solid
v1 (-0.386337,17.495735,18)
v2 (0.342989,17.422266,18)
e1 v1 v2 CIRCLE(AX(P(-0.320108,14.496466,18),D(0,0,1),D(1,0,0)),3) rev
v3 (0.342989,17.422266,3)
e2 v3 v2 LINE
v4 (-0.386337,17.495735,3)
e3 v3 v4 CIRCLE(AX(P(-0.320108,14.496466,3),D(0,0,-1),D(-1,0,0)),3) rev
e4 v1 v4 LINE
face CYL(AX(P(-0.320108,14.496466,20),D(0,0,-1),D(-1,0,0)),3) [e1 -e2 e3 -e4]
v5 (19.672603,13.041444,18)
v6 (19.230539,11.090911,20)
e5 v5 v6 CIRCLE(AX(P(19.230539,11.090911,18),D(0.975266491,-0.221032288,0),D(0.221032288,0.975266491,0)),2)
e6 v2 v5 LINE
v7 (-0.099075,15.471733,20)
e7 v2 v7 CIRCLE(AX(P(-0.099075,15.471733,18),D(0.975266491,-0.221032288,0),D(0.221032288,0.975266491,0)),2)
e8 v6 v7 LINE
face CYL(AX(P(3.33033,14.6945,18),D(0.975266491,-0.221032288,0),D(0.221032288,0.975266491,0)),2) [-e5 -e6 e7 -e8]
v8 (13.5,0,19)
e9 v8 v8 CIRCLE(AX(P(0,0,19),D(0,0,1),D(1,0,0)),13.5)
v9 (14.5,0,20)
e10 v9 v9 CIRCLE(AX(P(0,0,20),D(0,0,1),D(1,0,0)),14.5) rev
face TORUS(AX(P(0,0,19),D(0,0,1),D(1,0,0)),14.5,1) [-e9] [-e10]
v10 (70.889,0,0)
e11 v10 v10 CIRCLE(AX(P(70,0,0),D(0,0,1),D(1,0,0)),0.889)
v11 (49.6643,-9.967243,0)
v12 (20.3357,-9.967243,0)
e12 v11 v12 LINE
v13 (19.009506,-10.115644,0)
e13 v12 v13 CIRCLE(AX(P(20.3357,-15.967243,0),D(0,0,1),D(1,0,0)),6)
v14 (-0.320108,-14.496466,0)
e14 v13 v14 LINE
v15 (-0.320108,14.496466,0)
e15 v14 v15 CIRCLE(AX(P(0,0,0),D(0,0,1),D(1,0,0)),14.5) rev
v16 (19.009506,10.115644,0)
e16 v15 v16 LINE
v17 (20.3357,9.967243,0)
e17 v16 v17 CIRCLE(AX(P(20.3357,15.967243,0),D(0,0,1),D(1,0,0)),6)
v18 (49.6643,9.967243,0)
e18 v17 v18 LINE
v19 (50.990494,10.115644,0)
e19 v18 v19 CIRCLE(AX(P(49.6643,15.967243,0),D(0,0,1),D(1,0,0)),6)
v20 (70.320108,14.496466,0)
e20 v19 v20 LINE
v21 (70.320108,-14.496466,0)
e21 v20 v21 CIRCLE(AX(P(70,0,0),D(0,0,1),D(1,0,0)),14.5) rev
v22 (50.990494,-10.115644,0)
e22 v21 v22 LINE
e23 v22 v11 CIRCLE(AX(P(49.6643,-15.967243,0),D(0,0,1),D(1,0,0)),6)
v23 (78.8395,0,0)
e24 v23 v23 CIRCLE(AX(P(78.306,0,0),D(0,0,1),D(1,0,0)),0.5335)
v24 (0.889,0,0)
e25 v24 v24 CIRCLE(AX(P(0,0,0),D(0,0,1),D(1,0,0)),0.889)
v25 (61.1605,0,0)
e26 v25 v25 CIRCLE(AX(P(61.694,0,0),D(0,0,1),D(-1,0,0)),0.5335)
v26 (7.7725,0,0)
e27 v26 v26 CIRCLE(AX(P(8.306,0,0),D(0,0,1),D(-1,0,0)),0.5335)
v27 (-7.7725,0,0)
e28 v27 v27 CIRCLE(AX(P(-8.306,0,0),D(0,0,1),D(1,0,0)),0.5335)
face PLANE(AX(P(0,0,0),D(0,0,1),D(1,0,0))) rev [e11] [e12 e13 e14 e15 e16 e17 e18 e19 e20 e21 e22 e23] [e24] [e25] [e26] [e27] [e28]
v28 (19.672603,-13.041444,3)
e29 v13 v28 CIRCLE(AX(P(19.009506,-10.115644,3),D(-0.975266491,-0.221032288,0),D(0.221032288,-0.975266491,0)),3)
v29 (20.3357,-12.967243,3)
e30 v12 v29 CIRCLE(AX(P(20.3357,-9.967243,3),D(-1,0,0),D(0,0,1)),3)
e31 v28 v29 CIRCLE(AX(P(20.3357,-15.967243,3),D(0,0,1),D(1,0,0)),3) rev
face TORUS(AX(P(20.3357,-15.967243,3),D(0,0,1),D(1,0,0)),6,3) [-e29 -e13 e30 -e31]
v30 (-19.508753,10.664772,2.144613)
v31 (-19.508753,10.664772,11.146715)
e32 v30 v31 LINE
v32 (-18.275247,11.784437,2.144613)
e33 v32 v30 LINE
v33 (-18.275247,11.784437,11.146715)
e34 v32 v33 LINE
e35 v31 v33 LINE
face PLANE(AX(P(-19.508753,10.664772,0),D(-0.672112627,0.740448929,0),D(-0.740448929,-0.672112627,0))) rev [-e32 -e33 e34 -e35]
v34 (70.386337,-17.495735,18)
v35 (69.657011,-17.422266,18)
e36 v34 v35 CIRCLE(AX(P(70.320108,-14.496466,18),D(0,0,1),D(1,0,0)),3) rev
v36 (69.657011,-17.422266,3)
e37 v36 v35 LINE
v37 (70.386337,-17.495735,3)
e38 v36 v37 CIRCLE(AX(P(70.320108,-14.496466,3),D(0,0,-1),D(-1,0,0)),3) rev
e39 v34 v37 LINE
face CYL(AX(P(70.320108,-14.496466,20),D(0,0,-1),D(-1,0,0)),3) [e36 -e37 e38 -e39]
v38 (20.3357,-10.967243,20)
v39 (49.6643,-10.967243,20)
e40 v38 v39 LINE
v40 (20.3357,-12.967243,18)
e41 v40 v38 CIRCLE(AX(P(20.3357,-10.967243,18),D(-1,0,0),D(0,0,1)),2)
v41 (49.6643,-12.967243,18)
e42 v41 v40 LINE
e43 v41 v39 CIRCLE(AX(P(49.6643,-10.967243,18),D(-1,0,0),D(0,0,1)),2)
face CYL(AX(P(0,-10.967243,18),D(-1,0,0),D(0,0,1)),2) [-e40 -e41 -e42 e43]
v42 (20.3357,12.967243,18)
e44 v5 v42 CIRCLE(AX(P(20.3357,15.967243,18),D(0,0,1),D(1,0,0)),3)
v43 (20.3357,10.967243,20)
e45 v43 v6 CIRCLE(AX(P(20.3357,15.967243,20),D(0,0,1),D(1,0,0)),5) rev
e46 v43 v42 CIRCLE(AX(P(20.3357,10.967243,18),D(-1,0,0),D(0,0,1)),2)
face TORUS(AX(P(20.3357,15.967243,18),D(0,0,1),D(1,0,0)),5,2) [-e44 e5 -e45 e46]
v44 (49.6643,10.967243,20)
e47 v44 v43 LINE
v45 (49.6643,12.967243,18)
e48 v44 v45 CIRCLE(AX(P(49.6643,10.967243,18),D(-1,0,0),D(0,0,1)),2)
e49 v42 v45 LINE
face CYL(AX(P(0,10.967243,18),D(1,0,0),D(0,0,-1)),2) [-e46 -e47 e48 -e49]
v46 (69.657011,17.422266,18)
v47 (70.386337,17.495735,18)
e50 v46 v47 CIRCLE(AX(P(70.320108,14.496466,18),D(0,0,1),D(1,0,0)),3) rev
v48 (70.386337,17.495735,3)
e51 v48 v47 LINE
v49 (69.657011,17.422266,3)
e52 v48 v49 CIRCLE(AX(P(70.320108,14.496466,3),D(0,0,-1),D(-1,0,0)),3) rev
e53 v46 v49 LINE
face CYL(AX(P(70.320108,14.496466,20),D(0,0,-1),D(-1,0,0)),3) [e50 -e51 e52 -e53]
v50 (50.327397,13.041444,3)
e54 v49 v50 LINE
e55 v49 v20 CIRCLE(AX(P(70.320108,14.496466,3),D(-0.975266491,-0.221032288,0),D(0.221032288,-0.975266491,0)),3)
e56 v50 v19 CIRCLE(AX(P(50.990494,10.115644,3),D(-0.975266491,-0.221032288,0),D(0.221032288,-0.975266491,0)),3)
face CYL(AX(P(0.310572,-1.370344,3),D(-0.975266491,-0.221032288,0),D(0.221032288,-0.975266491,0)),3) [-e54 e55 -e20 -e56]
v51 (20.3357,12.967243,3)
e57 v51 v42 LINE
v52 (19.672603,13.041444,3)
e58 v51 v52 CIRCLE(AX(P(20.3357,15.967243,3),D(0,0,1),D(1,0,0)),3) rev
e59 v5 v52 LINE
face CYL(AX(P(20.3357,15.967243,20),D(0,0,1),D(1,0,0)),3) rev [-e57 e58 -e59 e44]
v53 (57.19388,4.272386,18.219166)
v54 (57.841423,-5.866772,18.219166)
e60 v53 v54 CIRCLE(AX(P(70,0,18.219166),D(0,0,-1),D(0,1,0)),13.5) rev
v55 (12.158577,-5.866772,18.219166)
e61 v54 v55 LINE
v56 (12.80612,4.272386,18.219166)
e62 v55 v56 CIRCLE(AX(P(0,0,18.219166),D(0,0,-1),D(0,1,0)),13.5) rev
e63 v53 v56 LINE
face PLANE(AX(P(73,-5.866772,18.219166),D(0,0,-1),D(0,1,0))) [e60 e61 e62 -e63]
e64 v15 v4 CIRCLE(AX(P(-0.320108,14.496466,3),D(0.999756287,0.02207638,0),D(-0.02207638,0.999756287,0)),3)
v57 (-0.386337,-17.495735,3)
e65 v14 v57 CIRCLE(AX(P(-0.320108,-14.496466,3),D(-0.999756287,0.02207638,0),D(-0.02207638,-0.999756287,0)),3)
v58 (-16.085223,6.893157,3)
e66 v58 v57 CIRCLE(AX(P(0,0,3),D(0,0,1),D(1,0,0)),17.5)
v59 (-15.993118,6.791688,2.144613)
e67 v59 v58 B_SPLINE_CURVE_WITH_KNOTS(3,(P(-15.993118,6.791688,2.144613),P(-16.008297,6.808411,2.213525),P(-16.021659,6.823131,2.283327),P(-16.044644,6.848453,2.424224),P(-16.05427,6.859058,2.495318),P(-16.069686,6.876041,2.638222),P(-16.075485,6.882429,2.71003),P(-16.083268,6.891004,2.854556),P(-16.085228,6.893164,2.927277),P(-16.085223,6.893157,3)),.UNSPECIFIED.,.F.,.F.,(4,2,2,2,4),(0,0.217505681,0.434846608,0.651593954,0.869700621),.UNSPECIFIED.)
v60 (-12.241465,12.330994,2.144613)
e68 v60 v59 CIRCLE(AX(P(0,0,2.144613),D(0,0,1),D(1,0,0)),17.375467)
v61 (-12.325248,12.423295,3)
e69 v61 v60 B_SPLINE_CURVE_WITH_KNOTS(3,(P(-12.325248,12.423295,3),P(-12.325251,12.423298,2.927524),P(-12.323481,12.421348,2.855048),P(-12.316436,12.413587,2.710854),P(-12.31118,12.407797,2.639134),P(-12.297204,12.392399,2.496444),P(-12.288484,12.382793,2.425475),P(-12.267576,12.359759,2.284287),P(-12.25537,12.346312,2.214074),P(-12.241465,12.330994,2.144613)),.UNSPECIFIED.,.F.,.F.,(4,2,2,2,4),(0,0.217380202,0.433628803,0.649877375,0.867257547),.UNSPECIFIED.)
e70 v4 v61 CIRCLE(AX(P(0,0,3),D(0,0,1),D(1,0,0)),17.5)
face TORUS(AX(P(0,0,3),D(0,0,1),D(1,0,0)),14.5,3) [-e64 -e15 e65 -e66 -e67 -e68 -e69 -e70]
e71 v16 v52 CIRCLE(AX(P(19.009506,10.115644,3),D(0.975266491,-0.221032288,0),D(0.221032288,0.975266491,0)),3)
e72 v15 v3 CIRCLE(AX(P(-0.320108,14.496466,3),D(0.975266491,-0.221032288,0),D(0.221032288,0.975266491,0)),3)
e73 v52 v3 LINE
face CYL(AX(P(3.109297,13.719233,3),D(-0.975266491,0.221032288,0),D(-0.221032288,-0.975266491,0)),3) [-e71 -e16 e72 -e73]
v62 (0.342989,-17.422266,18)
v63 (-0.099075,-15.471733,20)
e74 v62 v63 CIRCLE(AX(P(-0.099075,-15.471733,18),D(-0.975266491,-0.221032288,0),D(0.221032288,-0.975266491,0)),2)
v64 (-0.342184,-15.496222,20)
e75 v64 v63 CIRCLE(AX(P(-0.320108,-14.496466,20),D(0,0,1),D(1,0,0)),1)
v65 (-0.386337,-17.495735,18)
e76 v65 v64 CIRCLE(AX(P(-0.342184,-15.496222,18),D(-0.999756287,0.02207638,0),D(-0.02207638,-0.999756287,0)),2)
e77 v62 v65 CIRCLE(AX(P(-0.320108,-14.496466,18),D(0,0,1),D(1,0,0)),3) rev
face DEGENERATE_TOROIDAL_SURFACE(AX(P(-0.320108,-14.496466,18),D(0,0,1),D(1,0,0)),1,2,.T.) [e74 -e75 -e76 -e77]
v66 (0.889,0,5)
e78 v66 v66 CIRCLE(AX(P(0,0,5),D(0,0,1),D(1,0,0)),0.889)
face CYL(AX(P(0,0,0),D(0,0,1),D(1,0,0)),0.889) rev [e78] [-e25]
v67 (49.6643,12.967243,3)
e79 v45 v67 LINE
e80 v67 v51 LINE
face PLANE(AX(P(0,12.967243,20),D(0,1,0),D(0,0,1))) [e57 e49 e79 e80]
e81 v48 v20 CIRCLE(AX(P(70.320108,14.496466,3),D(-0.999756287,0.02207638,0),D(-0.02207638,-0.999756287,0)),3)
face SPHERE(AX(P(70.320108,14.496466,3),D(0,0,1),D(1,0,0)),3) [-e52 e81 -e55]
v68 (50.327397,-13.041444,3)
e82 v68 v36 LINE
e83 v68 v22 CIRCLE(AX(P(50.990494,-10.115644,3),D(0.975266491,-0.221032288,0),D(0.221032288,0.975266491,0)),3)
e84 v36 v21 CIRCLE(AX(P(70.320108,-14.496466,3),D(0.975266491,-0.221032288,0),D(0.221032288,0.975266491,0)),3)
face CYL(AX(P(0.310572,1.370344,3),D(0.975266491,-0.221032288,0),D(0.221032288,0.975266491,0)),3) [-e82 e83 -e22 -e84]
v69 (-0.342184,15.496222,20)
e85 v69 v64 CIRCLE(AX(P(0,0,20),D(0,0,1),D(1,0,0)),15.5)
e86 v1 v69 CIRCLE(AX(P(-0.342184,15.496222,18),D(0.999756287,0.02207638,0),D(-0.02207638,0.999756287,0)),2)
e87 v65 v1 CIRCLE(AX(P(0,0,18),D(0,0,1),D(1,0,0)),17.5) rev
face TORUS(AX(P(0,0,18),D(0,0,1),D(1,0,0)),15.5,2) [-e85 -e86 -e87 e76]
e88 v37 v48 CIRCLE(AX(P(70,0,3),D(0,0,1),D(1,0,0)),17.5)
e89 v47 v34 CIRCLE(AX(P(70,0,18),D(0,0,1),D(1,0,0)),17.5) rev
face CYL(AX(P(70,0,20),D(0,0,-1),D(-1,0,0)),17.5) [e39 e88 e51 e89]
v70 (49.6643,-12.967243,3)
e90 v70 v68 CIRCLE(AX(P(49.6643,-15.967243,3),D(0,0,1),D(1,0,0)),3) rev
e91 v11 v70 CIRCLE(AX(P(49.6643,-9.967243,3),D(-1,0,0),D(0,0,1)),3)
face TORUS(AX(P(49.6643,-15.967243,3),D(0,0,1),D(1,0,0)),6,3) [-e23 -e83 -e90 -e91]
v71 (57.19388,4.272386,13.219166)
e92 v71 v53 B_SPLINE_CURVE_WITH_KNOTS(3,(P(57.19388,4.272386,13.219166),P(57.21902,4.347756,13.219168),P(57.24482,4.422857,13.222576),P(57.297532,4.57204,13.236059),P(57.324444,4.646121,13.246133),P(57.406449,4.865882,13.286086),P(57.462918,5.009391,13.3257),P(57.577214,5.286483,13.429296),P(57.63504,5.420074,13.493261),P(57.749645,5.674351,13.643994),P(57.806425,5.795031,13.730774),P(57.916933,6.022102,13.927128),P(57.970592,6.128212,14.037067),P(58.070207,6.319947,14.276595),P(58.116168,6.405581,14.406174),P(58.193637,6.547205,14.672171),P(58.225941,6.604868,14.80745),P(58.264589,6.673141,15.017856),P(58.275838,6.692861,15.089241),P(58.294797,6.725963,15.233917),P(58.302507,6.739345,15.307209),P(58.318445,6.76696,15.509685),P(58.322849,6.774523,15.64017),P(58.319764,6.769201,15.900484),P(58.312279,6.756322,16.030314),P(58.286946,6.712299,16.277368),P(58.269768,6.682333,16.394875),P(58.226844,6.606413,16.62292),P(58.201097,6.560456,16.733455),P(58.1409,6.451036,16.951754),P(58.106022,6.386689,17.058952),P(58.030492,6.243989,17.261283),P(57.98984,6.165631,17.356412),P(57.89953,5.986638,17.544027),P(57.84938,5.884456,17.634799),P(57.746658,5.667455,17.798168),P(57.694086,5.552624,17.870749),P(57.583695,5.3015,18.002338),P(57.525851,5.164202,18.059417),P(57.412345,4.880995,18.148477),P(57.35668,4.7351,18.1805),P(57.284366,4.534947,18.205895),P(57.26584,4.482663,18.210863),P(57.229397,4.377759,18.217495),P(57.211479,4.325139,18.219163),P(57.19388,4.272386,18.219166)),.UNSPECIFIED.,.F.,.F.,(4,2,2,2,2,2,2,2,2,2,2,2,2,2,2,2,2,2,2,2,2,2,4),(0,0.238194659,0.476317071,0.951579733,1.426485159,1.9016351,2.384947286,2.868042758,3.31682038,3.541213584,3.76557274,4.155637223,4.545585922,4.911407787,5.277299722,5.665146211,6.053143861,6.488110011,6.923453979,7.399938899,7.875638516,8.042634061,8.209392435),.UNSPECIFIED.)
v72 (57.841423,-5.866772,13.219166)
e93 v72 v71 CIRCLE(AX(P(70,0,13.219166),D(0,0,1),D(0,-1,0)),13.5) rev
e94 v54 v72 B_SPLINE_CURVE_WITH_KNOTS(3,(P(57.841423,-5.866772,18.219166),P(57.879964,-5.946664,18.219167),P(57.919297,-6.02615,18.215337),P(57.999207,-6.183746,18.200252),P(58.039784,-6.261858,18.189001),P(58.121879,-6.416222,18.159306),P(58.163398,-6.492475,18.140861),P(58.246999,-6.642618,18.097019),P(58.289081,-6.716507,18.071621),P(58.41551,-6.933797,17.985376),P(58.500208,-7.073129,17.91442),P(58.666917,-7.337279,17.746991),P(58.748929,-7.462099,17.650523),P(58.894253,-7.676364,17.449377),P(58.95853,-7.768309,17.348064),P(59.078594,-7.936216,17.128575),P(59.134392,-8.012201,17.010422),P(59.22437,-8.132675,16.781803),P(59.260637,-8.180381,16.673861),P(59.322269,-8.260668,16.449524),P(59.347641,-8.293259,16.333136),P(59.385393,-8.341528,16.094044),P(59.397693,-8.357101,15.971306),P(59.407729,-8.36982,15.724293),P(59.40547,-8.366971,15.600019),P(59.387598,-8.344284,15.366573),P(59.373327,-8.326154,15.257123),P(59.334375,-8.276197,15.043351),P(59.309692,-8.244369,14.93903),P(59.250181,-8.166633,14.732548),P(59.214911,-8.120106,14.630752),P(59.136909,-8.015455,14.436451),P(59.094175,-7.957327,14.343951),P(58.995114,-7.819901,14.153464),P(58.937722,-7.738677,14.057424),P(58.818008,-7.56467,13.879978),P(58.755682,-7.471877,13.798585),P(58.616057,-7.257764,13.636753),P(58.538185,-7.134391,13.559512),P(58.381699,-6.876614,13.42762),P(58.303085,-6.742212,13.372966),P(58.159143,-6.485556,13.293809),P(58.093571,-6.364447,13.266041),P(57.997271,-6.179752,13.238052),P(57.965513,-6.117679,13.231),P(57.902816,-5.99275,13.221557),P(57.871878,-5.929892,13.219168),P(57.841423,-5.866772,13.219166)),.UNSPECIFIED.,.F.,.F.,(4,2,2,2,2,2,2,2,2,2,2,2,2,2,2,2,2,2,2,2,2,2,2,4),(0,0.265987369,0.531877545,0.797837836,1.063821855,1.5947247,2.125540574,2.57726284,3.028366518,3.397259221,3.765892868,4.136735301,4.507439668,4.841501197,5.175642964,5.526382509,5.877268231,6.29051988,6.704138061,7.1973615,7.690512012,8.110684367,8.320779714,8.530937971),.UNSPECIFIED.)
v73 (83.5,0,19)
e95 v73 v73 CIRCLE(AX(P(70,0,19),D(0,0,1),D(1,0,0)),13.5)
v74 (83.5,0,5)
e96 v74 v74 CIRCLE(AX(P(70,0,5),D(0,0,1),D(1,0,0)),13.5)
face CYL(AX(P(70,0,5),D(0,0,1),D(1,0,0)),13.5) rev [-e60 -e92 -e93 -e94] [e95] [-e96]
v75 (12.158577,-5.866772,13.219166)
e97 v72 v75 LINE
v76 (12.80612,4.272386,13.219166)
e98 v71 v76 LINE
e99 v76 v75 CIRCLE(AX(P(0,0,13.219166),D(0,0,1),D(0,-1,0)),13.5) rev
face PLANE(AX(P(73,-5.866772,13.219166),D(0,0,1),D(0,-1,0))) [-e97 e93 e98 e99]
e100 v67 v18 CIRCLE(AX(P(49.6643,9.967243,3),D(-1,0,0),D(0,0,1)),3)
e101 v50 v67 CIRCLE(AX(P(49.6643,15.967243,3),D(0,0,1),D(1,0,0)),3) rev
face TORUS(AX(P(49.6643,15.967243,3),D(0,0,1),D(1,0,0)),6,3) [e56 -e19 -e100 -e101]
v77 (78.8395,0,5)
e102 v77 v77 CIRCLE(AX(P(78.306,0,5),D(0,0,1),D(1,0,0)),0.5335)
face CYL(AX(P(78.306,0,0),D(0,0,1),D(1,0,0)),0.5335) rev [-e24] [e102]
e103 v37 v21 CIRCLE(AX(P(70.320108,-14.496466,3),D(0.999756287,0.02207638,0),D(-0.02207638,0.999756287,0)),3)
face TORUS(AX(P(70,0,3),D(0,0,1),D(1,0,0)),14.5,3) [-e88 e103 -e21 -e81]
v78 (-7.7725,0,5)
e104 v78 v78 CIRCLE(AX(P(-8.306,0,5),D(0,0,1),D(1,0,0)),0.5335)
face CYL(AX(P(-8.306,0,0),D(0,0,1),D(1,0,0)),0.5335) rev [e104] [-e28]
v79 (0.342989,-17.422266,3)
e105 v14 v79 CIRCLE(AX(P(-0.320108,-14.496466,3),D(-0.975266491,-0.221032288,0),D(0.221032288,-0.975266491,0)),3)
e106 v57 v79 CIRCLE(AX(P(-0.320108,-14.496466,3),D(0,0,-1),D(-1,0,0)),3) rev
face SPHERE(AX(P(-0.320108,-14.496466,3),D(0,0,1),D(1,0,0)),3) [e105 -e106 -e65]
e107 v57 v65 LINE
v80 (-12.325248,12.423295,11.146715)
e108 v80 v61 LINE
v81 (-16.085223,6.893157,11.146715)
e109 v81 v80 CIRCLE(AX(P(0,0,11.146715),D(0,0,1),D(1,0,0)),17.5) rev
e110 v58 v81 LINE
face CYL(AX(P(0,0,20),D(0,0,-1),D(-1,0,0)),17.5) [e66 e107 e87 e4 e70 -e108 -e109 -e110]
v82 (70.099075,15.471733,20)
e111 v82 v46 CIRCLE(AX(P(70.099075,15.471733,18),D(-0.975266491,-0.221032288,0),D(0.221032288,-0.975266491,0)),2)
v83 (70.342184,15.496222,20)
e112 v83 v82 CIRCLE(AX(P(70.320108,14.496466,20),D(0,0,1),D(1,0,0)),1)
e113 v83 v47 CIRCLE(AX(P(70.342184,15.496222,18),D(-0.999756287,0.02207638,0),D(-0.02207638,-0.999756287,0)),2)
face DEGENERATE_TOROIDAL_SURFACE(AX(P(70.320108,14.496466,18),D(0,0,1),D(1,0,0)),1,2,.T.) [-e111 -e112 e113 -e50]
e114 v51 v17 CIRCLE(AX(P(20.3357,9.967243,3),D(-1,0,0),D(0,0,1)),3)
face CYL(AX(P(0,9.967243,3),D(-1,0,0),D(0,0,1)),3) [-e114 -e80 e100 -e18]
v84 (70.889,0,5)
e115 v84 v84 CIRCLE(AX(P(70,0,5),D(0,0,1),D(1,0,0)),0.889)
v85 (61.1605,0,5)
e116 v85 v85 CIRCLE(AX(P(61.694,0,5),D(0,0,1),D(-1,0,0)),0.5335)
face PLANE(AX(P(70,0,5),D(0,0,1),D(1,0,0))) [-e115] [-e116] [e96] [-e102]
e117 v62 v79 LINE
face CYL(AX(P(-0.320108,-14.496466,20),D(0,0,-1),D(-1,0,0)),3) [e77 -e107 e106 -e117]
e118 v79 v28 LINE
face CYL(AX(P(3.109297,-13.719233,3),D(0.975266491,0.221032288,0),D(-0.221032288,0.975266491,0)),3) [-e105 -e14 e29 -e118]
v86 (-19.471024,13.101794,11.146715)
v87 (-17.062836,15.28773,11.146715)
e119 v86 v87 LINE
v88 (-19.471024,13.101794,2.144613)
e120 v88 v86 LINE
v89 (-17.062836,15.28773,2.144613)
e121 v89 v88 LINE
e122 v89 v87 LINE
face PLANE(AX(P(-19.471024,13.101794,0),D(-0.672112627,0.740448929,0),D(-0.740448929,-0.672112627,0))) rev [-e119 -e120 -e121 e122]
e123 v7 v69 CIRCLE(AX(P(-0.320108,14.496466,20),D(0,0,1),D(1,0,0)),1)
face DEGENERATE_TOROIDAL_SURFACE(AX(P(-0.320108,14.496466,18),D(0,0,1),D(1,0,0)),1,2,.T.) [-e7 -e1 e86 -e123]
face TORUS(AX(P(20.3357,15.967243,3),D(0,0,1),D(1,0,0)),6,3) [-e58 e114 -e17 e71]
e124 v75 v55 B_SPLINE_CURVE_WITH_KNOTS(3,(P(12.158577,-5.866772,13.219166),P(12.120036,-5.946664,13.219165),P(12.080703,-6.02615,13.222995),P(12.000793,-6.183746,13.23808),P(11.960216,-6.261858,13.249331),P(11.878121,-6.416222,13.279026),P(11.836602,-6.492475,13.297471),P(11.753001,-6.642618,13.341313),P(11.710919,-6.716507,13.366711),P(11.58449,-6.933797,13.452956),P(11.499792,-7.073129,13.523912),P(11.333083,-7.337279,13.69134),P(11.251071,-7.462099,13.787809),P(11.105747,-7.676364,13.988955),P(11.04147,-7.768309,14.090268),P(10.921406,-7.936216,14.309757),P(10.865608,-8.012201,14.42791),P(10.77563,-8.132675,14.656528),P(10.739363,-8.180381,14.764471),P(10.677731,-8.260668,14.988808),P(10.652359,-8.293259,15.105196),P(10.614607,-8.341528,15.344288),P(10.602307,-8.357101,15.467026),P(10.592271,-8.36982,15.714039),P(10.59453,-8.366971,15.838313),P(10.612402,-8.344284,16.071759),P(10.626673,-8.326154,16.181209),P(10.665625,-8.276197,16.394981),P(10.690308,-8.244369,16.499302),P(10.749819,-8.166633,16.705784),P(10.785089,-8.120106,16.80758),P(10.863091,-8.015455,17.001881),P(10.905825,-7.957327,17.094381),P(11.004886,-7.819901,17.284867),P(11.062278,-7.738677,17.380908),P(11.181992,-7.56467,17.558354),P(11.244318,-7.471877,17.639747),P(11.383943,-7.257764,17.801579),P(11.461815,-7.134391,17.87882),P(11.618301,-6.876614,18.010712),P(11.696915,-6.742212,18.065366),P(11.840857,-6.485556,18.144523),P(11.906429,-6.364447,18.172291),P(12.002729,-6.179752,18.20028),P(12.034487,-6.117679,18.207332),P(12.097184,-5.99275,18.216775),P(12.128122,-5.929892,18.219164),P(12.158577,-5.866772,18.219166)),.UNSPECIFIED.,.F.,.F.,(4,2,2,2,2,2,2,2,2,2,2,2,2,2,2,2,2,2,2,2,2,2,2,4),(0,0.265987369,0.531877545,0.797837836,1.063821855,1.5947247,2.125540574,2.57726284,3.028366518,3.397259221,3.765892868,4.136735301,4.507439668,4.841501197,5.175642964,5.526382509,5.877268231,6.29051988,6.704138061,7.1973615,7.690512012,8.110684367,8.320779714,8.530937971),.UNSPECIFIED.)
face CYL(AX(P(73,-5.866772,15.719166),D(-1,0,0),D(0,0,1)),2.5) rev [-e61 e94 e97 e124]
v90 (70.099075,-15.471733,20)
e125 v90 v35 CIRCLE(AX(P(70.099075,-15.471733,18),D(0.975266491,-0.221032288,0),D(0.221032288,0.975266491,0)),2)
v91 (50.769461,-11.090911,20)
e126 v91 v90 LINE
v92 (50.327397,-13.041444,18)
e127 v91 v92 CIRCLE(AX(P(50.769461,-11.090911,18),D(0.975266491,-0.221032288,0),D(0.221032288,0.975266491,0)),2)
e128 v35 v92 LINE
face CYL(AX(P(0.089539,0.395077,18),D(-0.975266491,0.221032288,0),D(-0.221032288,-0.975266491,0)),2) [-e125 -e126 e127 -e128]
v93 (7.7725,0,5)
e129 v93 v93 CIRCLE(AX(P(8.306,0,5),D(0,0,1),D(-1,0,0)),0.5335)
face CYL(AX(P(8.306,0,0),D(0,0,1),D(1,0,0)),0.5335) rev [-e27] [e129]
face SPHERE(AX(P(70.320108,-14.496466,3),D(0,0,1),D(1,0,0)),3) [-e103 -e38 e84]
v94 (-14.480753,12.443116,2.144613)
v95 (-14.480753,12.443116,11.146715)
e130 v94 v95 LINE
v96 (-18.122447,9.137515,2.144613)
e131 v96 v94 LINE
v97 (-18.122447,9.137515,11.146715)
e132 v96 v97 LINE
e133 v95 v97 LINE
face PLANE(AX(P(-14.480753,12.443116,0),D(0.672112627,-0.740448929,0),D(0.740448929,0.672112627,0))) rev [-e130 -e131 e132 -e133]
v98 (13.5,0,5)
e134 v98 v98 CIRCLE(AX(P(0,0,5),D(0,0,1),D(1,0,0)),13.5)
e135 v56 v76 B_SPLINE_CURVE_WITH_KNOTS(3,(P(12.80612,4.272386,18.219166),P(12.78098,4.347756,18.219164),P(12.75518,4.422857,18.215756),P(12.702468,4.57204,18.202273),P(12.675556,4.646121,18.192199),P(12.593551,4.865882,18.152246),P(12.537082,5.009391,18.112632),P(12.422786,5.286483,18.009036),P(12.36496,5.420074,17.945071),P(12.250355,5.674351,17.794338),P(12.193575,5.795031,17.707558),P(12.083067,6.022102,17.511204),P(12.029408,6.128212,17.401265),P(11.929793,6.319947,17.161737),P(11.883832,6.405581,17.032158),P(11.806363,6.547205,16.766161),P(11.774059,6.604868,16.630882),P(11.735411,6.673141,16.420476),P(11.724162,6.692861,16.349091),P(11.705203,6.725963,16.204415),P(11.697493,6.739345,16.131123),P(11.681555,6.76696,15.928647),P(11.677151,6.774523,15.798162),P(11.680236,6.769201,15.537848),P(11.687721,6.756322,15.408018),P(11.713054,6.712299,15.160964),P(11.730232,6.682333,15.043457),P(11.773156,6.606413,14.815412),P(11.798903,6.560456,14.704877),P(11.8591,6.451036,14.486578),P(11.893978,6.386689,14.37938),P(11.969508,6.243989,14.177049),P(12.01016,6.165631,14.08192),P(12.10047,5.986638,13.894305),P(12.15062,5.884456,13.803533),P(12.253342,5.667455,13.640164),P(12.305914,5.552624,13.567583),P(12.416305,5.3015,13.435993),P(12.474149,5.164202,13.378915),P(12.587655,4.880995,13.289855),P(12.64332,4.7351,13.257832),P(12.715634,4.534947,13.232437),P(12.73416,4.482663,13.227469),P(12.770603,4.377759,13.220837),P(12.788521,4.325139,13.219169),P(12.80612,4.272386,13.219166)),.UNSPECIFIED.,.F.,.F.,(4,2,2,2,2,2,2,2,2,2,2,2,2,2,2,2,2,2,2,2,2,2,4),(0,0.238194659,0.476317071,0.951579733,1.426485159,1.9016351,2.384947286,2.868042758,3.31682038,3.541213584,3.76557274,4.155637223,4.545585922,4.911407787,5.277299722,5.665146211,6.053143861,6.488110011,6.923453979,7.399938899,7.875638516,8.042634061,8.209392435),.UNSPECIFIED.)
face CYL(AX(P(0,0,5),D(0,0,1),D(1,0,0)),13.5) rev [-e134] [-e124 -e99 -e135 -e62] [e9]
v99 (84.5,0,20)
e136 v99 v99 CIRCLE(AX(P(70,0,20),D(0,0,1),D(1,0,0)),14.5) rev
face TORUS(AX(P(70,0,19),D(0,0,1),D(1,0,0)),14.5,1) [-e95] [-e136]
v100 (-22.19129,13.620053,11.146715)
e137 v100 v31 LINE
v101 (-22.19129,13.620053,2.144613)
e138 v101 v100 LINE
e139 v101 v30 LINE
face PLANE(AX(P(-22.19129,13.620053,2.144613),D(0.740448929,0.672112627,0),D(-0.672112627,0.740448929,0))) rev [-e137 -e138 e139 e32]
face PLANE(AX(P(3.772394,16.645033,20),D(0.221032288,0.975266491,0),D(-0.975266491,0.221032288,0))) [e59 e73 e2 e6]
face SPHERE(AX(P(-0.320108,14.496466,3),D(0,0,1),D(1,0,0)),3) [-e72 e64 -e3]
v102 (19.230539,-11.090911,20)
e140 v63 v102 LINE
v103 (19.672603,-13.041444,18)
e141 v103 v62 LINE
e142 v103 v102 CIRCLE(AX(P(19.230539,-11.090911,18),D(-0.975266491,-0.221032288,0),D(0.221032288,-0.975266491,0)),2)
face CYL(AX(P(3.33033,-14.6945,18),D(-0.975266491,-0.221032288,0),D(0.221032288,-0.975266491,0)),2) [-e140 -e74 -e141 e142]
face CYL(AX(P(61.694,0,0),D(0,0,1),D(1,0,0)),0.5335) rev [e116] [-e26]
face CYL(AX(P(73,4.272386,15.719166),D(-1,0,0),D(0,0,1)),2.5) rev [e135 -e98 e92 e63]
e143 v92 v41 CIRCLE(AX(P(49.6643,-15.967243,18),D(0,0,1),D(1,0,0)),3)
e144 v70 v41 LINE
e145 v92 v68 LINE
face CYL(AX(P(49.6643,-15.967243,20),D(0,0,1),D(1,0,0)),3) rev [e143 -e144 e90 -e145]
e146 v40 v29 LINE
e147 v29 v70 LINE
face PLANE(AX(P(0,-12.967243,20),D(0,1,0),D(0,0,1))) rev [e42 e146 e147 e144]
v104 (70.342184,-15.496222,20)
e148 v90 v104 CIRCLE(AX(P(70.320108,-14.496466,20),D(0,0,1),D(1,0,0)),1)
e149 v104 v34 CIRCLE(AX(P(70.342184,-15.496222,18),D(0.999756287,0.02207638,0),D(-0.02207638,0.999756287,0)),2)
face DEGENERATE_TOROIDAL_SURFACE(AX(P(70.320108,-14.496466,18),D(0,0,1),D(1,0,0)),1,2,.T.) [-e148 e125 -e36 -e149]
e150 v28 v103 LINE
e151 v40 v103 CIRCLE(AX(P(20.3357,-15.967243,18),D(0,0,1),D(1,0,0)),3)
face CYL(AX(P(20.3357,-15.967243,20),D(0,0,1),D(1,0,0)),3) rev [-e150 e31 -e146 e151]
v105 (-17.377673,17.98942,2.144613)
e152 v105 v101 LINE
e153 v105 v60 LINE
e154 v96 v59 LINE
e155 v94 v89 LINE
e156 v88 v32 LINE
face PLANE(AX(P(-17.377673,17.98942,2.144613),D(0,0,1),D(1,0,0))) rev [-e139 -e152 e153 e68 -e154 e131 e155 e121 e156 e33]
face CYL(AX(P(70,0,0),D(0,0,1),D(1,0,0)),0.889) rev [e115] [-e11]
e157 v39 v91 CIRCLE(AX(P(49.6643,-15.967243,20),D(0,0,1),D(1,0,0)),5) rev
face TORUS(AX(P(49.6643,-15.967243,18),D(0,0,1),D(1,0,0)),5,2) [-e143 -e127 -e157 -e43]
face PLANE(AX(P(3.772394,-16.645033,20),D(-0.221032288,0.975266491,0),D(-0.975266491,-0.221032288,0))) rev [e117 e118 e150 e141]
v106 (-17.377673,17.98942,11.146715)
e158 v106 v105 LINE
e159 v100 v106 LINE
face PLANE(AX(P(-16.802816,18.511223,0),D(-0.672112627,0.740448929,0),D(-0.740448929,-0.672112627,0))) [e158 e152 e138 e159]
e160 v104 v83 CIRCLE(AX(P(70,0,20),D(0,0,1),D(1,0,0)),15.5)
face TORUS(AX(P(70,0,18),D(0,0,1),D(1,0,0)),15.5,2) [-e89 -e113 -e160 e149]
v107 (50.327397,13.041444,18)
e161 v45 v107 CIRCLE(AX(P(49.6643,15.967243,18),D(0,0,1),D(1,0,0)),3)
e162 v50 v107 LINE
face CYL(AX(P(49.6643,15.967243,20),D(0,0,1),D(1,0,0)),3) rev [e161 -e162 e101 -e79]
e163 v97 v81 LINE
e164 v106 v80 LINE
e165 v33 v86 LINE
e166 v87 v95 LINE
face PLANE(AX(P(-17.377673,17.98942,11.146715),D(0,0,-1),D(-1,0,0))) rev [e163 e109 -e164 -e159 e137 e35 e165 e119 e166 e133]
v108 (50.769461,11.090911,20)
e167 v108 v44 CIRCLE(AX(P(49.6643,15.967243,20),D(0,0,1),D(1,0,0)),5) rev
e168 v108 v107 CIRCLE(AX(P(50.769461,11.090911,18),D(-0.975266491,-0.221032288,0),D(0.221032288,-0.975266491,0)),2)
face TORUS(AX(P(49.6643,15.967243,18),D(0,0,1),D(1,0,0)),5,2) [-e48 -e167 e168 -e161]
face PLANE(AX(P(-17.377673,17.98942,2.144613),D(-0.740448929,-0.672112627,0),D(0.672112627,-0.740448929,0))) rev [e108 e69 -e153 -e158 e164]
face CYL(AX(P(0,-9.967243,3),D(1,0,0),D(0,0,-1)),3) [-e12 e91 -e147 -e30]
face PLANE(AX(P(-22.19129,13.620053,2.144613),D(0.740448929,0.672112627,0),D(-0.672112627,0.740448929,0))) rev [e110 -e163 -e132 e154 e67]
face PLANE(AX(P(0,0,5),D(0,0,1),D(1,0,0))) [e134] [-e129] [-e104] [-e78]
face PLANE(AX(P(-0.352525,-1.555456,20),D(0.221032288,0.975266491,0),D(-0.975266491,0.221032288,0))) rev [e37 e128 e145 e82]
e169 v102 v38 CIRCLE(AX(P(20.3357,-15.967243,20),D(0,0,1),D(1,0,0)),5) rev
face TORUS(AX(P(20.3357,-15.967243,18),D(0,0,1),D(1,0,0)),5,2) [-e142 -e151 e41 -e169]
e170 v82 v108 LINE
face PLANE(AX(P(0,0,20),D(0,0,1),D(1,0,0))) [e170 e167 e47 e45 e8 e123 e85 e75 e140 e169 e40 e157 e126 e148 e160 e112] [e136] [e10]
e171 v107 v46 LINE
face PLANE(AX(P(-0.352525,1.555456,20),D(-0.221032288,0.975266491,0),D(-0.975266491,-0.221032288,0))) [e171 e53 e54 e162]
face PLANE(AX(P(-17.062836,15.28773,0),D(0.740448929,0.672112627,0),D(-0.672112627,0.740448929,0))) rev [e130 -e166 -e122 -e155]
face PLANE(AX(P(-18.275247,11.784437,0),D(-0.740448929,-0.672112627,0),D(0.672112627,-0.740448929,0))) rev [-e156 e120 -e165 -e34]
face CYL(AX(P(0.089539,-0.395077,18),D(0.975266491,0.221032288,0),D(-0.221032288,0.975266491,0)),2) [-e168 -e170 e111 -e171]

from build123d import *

# Parameters (mm, degrees)
BOSS_EXTRUDE2_DEPTH             = 20
SKETCH12_R                      = 13.5
SKETCH12_R_2                    = 13.500000000000002
CUT_EXTRUDE3_DEPTH              = 15
SKETCH13_R                      = 0.889
SKETCH13_R_2                    = 0.533499999999999
CUT_EXTRUDE4_DEPTH              = 91.48480535426931
SKETCH14_R                      = 0.8890000000000032
SKETCH14_R_2                    = 0.5335000000000029
SKETCH14_R_3                    = 0.5335000000000094
CUT_EXTRUDE5_DEPTH              = 91.48480535426931
FILLET2_R                       = 3
CUT_EXTRUDE8_DEPTH              = 63.00000000000004
FILLET3_R                       = 1
BOSS_EXTRUDE3_REACH             = 107.737
BOSS_EXTRUDE3_END_RADIUS        = 17.500000000000004
SKETCH19_W                      = 9.002102243584886
SKETCH19_H                      = 6.500944555170919
BOSS_EXTRUDE3_DIRECTION_2_DEPTH = 7.5
CUT_EXTRUDE9_DEPTH              = 91.02287753534617
CUT_EXTRUDE9_DEPTH_BACK         = 91.02287753534617
FILLET9_R                       = 2
FILLET11_R                      = 3


with BuildPart() as part:
    # Sketch10 → Boss-Extrude2 (new body)
    with BuildSketch(Plane.XY):
        with BuildLine():
            ThreePointArc((0, 17.500000000000004), (-17.500000000000004, 1.07e-15), (-2.14e-15, -17.500000000000004))
            Line((0, -17.5), (20.000000000000004, -12.967243251438873))
            Line((20.000000000000004, -12.967243251438873), (50, -12.967243251438873))
            Line((50, -12.967243251438873), (70, -17.5))
            ThreePointArc((70, -17.50000000000002), (87.50000000000003, -1.07e-15), (70, 17.50000000000002))
            Line((70, 17.5), (50, 12.967243251438873))
            Line((50, 12.967243251438873), (20.000000000000004, 12.967243251438873))
            Line((20.000000000000004, 12.967243251438873), (0, 17.5))
        make_face()
    extrude(amount=BOSS_EXTRUDE2_DEPTH)

    # Sketch12 → Cut-Extrude3 (cut)
    with BuildSketch(Plane.XY.offset(20)):
        Circle(SKETCH12_R)
        with Locations((70, 0)):
            Circle(SKETCH12_R_2)
    extrude(amount=-CUT_EXTRUDE3_DEPTH, mode=Mode.SUBTRACT)

    # Sketch13 → Cut-Extrude4 (cut, through all)
    with BuildSketch(Plane.XY.offset(5.000000000000001)):
        Circle(SKETCH13_R)
        with Locations((-8.306, 0)):
            Circle(SKETCH13_R_2)
        with Locations(Location((8.306000000000003, 2.03e-15, 0), (0, 0, 180))):
            Circle(SKETCH13_R_2)
    extrude(amount=-CUT_EXTRUDE4_DEPTH, mode=Mode.SUBTRACT)

    # Sketch14 → Cut-Extrude5 (cut, through all)
    with BuildSketch(Plane.XY.offset(5.000000000000001)):
        with Locations((70, 0)):
            Circle(SKETCH14_R)
        with Locations((78.306, -6.5e-16)):
            Circle(SKETCH14_R_2)
        with Locations(Location((61.69400000000001, -2.69e-15, 0), (0, 0, 180))):
            Circle(SKETCH14_R_3)
    extrude(amount=-CUT_EXTRUDE5_DEPTH, mode=Mode.SUBTRACT)

    # Fillet2
    fillet2_edges = [part.edges().sort_by_distance(p)[0] for p in [
        (20.000000000000004, -12.967243251438873, 10),
        (-3.18e-15, -17.5, 10),
        (0, 17.5, 10),
        (20.000000000000004, 12.967243251438873, 10),
        (50, 12.967243251438873, 10),
        (70, 17.500000000000014, 10),
        (70, -17.500000000000014, 10),
        (50, -12.967243251438873, 10),
    ]]
    fillet(fillet2_edges, radius=FILLET2_R)

    # Sketch17 → Cut-Extrude8 (cut)
    with BuildSketch(Plane(origin=(10, 0, 0), x_dir=(0, 0, -1), z_dir=(1, 0, 0))):
        with BuildLine():
            Line((-18.219165985751065, -5.866772091514335), (-18.21916598575106, 4.2723857354989))
            ThreePointArc((-18.21916598575106, 4.2723857354989), (-15.719165985751069, 6.772385735498896), (-13.219165985751072, 4.2723857354989))
            Line((-13.219165985751072, 4.2723857354989), (-13.219165985751069, -5.866772091514335))
            ThreePointArc((-13.219165985751069, -5.866772091514335), (-15.719165985751069, -8.366772091514331), (-18.219165985751065, -5.866772091514335))
        make_face()
    extrude(amount=CUT_EXTRUDE8_DEPTH, mode=Mode.SUBTRACT)

    # Fillet3
    fillet3_edges = [part.edges().sort_by_distance(p)[0] for p in [
        (-13.5, 1.65e-15, 20),
        (56.5, 1.65e-15, 20),
    ]]
    fillet(fillet3_edges, radius=FILLET3_R)

    # Boss-Extrude3: up to this cylinder (the profile starts outside it)
    boss_extrude3_end = Plane(origin=(0, 0, 6.645664), z_dir=(0, 0, -1)) * Cylinder(BOSS_EXTRUDE3_END_RADIUS, 251.474, mode=Mode.PRIVATE)
    # Sketch19 → Boss-Extrude3 (add, up to the surface)
    with BuildSketch(Plane(origin=(-11.761970975540276, 12.9578562567482, 0), x_dir=(0, 0, -1), z_dir=(-0.6721126271737297, 0.7404489289570396, 0)), mode=Mode.PRIVATE) as boss_extrude3_sk1:
        with Locations((-6.645664050040523, 4.026835519852057)):
            Rectangle(SKETCH19_W, SKETCH19_H)
    boss_extrude3_tool1 = extrude(boss_extrude3_sk1.sketch, amount=-BOSS_EXTRUDE3_REACH, mode=Mode.PRIVATE) - boss_extrude3_end
    add(boss_extrude3_tool1.solids().sort_by_distance((-14.743637, 10.251369, 6.645664))[0])

    # Sketch19 → Boss-Extrude3 direction 2 (add)
    with BuildSketch(Plane(origin=(-11.761970975540276, 12.9578562567482, 0), x_dir=(0, 0, -1), z_dir=(-0.6721126271737297, 0.7404489289570396, 0))):
        with Locations((-6.645664050040523, 4.026835519852057)):
            Rectangle(SKETCH19_W, SKETCH19_H)
    extrude(amount=BOSS_EXTRUDE3_DIRECTION_2_DEPTH)

    # Sketch21 → Cut-Extrude9 (cut, two sides: drawn at the far end of the back side and taken through both)
    with BuildSketch(Plane.XY.offset(11.146715171832966).offset(-CUT_EXTRUDE9_DEPTH_BACK)):
        Polygon((-19.508753299581933, 10.664771644994326), (-18.27524674807696, 11.784437426854238), (-19.471024426071118, 13.101794466647876), (-17.06283639674614, 15.287729944193623), (-14.480752862896878, 12.443115946751053), (-18.122447443726838, 9.1375146873454), align=None)
    extrude(amount=CUT_EXTRUDE9_DEPTH + CUT_EXTRUDE9_DEPTH_BACK, mode=Mode.SUBTRACT)

    # Fillet9
    fillet9_edges = [part.edges().sort_by_distance(p)[0] for p in [
        (49.99791778292249, 12.985851092176992, 20),
        (20.00208221707747, 12.985851092176995, 20),
        (87.50000000000003, -1.07e-15, 20),
        (59.99220377741234, -15.231854706692062, 20),
        (35.00000000000002, -12.967243251438873, 20),
        (59.99220377741232, 15.231854706692058, 20),
        (34.99999999999998, 12.967243251438873, 20),
        (10.0077962225877, 15.231854706692053, 20),
        (-17.5, -7e-16, 20),
        (10.007796222587723, -15.231854706692047, 20),
        (-0.01942127728087611, 17.48135942497659, 20),
        (70.01942127728097, 17.481359424976606, 20),
        (-0.01942127728087728, -17.48135942497659, 20),
        (70.01942127728098, -17.48135942497661, 20),
        (49.997917782922535, -12.985851092176995, 20),
        (20.002082217077515, -12.985851092176992, 20),
    ]]
    fillet(fillet9_edges, radius=FILLET9_R)

    # Fillet11
    # the kernel refuses this fillet: 3 mm, written as the material it takes off along each edge
    with BuildSketch(Plane(origin=(20.335699951455897, 15.967243251438873, 0), x_dir=(0, -1, 0), z_dir=(1, 0, 0))) as fillet11_piece_1:
        with BuildLine():
            CenterArc((3 + FILLET11_R, -FILLET11_R), FILLET11_R, 90, 90)
            Line((3 + FILLET11_R, 4.4e-16), (3, 0))
            Line((3, 0), (3, -FILLET11_R))
        make_face()
    revolve(axis=Axis((20.335699951455897, 15.967243251438873, 0), (0, 0, -1)), revolution_arc=12.769671479797836, mode=Mode.SUBTRACT)
    with BuildSketch(Plane(origin=(19.672603086478194, 13.041443779900076, 0), x_dir=(0, 0, 1), z_dir=(-0.9752664905129345, 0.22103228832590147, 0))) as fillet11_piece_2:
        with BuildLine():
            CenterArc((FILLET11_R, -FILLET11_R), FILLET11_R, 90, 90)
            Line((-4.4e-16, -FILLET11_R), (0, 0))
            Line((0, 0), (FILLET11_R, 0))
        make_face()
    extrude(amount=19.81982762230938, mode=Mode.SUBTRACT)
    with BuildSketch(Plane(origin=(-0.32010750628049367, 14.496466161945229, 0), x_dir=(0.22103228832590088, 0.9752664905129346, 0), z_dir=(0.9752664905129346, -0.22103228832590088, 0))) as fillet11_piece_3:
        with BuildLine():
            CenterArc((2.9999999999999987 - FILLET11_R, FILLET11_R), FILLET11_R, 270, 90)
            Line((2.9999999999999987 - FILLET11_R, -4.4e-16), (2.9999999999999987, 0))
            Line((2.9999999999999987, 0), (2.999999999999999, FILLET11_R))
        make_face()
    revolve(axis=Axis((-0.32010750628049367, 14.496466161945229, 0), (0, 0, 1)), revolution_arc=14.03465763220754, mode=Mode.SUBTRACT)
    with BuildSketch(Plane(origin=(1.78e-15, 0, 0), x_dir=(-0.022076379743482318, 0.9997562870307052, 0), z_dir=(0.9997562870307052, 0.022076379743482318, 0))) as fillet11_piece_4_section:
        with BuildLine():
            CenterArc((17.500000000000004 - FILLET11_R, FILLET11_R), FILLET11_R, 270, 90)
            Line((17.500000000000004 - FILLET11_R, -4.4e-16), (17.500000000000004, 0))
            Line((17.500000000000004, 0), (17.500000000000004, FILLET11_R))
        make_face()
    fillet11_piece_4 = revolve(axis=Axis((1.78e-15, 0, 0), (0, 0, 1)), revolution_arc=177.4700276951803, mode=Mode.PRIVATE)
    fillet11_piece_4 = split(fillet11_piece_4, bisect_by=Plane(origin=(-6.837512008717816, 16.0862166267895, 2.1446129282480797), z_dir=(0, 0, 1)), keep=Keep.TOP, mode=Mode.PRIVATE)
    fillet11_piece_4 = split(fillet11_piece_4, bisect_by=Plane(origin=(-11.669151644289231, 11.700490775859087, 2.5662882283798063), z_dir=(0.7404489289570396, 0.6721126271737297, 0)), keep=Keep.TOP, mode=Mode.PRIVATE)
    add(fillet11_piece_4, mode=Mode.SUBTRACT)
    with BuildSketch(Plane(origin=(1.78e-15, 0, 0), x_dir=(-0.022076379743482318, 0.9997562870307052, 0), z_dir=(0.9997562870307052, 0.022076379743482318, 0))) as fillet11_piece_5_section:
        with BuildLine():
            CenterArc((17.500000000000004 - FILLET11_R, FILLET11_R), FILLET11_R, 270, 90)
            Line((17.500000000000004 - FILLET11_R, -4.4e-16), (17.500000000000004, 0))
            Line((17.500000000000004, 0), (17.500000000000004, FILLET11_R))
        make_face()
    fillet11_piece_5 = revolve(axis=Axis((1.78e-15, 0, 0), (0, 0, 1)), revolution_arc=177.4700276951803, mode=Mode.PRIVATE)
    fillet11_piece_5 = split(fillet11_piece_5, bisect_by=Plane(origin=(-6.432198189279362, 15.101517940954933, 2.1446129282480797), z_dir=(0, 0, -1)), keep=Keep.TOP, mode=Mode.PRIVATE)
    fillet11_piece_5 = split(fillet11_piece_5, bisect_by=Plane(origin=(-10.996006905315603, 10.958904796285973, 0.6199816632256723), z_dir=(0.7404489289570396, 0.6721126271737297, 0)), keep=Keep.TOP, mode=Mode.PRIVATE)
    add(fillet11_piece_5, mode=Mode.SUBTRACT)
    with BuildSketch(Plane(origin=(1.78e-15, 0, 0), x_dir=(-0.022076379743482318, 0.9997562870307052, 0), z_dir=(0.9997562870307052, 0.022076379743482318, 0))) as fillet11_piece_6_section:
        with BuildLine():
            CenterArc((17.500000000000004 - FILLET11_R, FILLET11_R), FILLET11_R, 270, 90)
            Line((17.500000000000004 - FILLET11_R, -4.4e-16), (17.500000000000004, 0))
            Line((17.500000000000004, 0), (17.500000000000004, FILLET11_R))
        make_face()
    fillet11_piece_6 = revolve(axis=Axis((1.78e-15, 0, 0), (0, 0, 1)), revolution_arc=177.4700276951803, mode=Mode.PRIVATE)
    fillet11_piece_6 = split(fillet11_piece_6, bisect_by=Plane(origin=(-16.256928066393282, 7.082320707872399, 0.6073763093884104), z_dir=(0.7404489289570396, 0.6721126271737297, 0)), keep=Keep.TOP, mode=Mode.PRIVATE)
    fillet11_piece_6 = split(fillet11_piece_6, bisect_by=Plane(origin=(-13.8911757197956, 9.229736907331091, 2.1446129282480797), z_dir=(0, 0, -1)), keep=Keep.TOP, mode=Mode.PRIVATE)
    fillet11_piece_6 = split(fillet11_piece_6, bisect_by=Plane(origin=(-11.443310633307878, 11.451687631959079, 0.6073763093884099), z_dir=(-0.7404489289570396, -0.6721126271737297, 0)), keep=Keep.TOP, mode=Mode.PRIVATE)
    add(fillet11_piece_6, mode=Mode.SUBTRACT)
    with BuildSketch(Plane(origin=(1.78e-15, 0, 0), x_dir=(-0.022076379743482318, 0.9997562870307052, 0), z_dir=(0.9997562870307052, 0.022076379743482318, 0))) as fillet11_piece_7_section:
        with BuildLine():
            CenterArc((17.500000000000004 - FILLET11_R, FILLET11_R), FILLET11_R, 270, 90)
            Line((17.500000000000004 - FILLET11_R, -4.4e-16), (17.500000000000004, 0))
            Line((17.500000000000004, 0), (17.500000000000004, FILLET11_R))
        make_face()
    fillet11_piece_7 = revolve(axis=Axis((1.78e-15, 0, 0), (0, 0, 1)), revolution_arc=177.4700276951803, mode=Mode.PRIVATE)
    fillet11_piece_7 = split(fillet11_piece_7, bisect_by=Plane(origin=(-7.320045882534297, -2.7632090050267077, 2.565729406664275), z_dir=(-0.7404489289570396, -0.6721126271737297, 0)), keep=Keep.TOP, mode=Mode.PRIVATE)
    fillet11_piece_7 = split(fillet11_piece_7, bisect_by=Plane(origin=(-14.700675871675383, -9.462677959875641, 2.1446129282480797), z_dir=(0, 0, 1)), keep=Keep.TOP, mode=Mode.PRIVATE)
    add(fillet11_piece_7, mode=Mode.SUBTRACT)
    with BuildSketch(Plane(origin=(1.78e-15, 0, 0), x_dir=(-0.022076379743482318, 0.9997562870307052, 0), z_dir=(0.9997562870307052, 0.022076379743482318, 0))) as fillet11_piece_8_section:
        with BuildLine():
            CenterArc((17.500000000000004 - FILLET11_R, FILLET11_R), FILLET11_R, 270, 90)
            Line((17.500000000000004 - FILLET11_R, -4.4e-16), (17.500000000000004, 0))
            Line((17.500000000000004, 0), (17.500000000000004, FILLET11_R))
        make_face()
    fillet11_piece_8 = revolve(axis=Axis((1.78e-15, 0, 0), (0, 0, 1)), revolution_arc=177.4700276951803, mode=Mode.PRIVATE)
    fillet11_piece_8 = split(fillet11_piece_8, bisect_by=Plane(origin=(-7.173645641389987, -2.9244943274141075, 0.5618888728889413), z_dir=(-0.7404489289570396, -0.6721126271737297, 0)), keep=Keep.TOP, mode=Mode.PRIVATE)
    fillet11_piece_8 = split(fillet11_piece_8, bisect_by=Plane(origin=(-13.706999923478332, -8.854882959316505, 2.1446129282480797), z_dir=(0, 0, -1)), keep=Keep.TOP, mode=Mode.PRIVATE)
    add(fillet11_piece_8, mode=Mode.SUBTRACT)
    with BuildSketch(Plane(origin=(-0.32010750628049367, -14.496466161945229, 0), x_dir=(-0.022076379743483195, -0.9997562870307051, 0), z_dir=(-0.9997562870307051, 0.022076379743483195, 0))) as fillet11_piece_9:
        with BuildLine():
            CenterArc((3.0000000000000004 - FILLET11_R, FILLET11_R), FILLET11_R, 270, 90)
            Line((3.0000000000000004 - FILLET11_R, -4.4e-16), (3.0000000000000004, 0))
            Line((3.0000000000000004, 0), (3.0000000000000004, FILLET11_R))
        make_face()
    revolve(axis=Axis((-0.32010750628049367, -14.496466161945229, 0), (0, 0, 1)), revolution_arc=14.034657632207667, mode=Mode.SUBTRACT)
    with BuildSketch(Plane(origin=(0.34298935869720953, -17.422265633484027, 0), x_dir=(1e-17, -5e-17, 1), z_dir=(0.9752664905129345, 0.22103228832590147, 0))) as fillet11_piece_10:
        with BuildLine():
            CenterArc((FILLET11_R, -FILLET11_R), FILLET11_R, 90, 90)
            Line((-5.9e-16, -FILLET11_R), (0, 0))
            Line((0, 0), (FILLET11_R, 0))
        make_face()
    extrude(amount=19.81982762230942, mode=Mode.SUBTRACT)
    with BuildSketch(Plane(origin=(20.33569995145594, -15.96724325143887, 0), x_dir=(0, 1, 0), z_dir=(1, 0, 0))) as fillet11_piece_11:
        with BuildLine():
            CenterArc((3 + FILLET11_R, FILLET11_R), FILLET11_R, 180, 90)
            Line((3 + FILLET11_R, -4.4e-16), (3, 0))
            Line((3, 0), (3, FILLET11_R))
        make_face()
    revolve(axis=Axis((20.33569995145594, -15.96724325143887, 0), (0, 0, 1)), revolution_arc=12.76967147979776, mode=Mode.SUBTRACT)
    with BuildSketch(Plane(origin=(20.33569995145594, -12.967243251438873, 0), x_dir=(0, 0, 1), z_dir=(1, 0, 0)), Plane(origin=(49.664300048544064, 12.967243251438873, 0), x_dir=(0, 0, 1), z_dir=(-1, 0, 0))) as fillet11_piece_12:
        with BuildLine():
            CenterArc((FILLET11_R, -FILLET11_R), FILLET11_R, 90, 90)
            Line((-4.4e-16, -FILLET11_R), (0, 0))
            Line((0, 0), (FILLET11_R, 0))
        make_face()
    extrude(amount=29.328600097088167, mode=Mode.SUBTRACT)
    with BuildSketch(Plane(origin=(49.664300048544106, -15.967243251438873, 0), x_dir=(0.22103228832590116, 0.9752664905129346, 0), z_dir=(0.9752664905129346, -0.22103228832590116, 0))) as fillet11_piece_13:
        with BuildLine():
            CenterArc((2.999999999999999 + FILLET11_R, FILLET11_R), FILLET11_R, 180, 89.99999999999994)
            Line((2.999999999999999 + FILLET11_R, -4.4e-16), (2.999999999999999, 0))
            Line((2.999999999999999, 0), (3.000000000000001, FILLET11_R))
        make_face()
    revolve(axis=Axis((49.664300048544106, -15.967243251438873, 0), (0, 0, 1)), revolution_arc=12.769671479797784, mode=Mode.SUBTRACT)
    with BuildSketch(Plane(origin=(50.32739691352181, -13.041443779900076, 0), x_dir=(-1.4e-16, -6.2e-16, 1), z_dir=(0.9752664905129345, -0.2210322883259015, 0))) as fillet11_piece_14:
        with BuildLine():
            CenterArc((FILLET11_R, -FILLET11_R), FILLET11_R, 89.99999999999997, 90)
            Line((-2.34e-15, -FILLET11_R), (0, 0))
            Line((0, 0), (FILLET11_R, 0))
        make_face()
    extrude(amount=19.81982762230946, mode=Mode.SUBTRACT)
    with BuildSketch(Plane(origin=(70.32010750628058, -14.496466161945248, 0), x_dir=(0.022076379743490793, -0.999756287030705, 0), z_dir=(0.999756287030705, 0.022076379743490793, 0))) as fillet11_piece_15:
        with BuildLine():
            CenterArc((2.9999999999999996 - FILLET11_R, -FILLET11_R), FILLET11_R, 0, 89.99999999999997)
            Line((2.9999999999999996 - FILLET11_R, 4.4e-16), (2.9999999999999996, 0))
            Line((2.9999999999999996, 0), (2.9999999999999996, -FILLET11_R))
        make_face()
    revolve(axis=Axis((70.32010750628058, -14.496466161945248, 0), (0, 0, -1)), revolution_arc=14.034657632208075, mode=Mode.SUBTRACT)
    with BuildSketch(Plane(origin=(70, 0, 0), x_dir=(0.022076379743487775, -0.999756287030705, 0), z_dir=(-0.999756287030705, -0.022076379743487775, 0))) as fillet11_piece_16:
        with BuildLine():
            CenterArc((17.500000000000025 - FILLET11_R, FILLET11_R), FILLET11_R, 270, 90)
            Line((17.500000000000025 - FILLET11_R, -4.4e-16), (17.500000000000025, 0))
            Line((17.500000000000025, 0), (17.500000000000025, FILLET11_R))
        make_face()
    revolve(axis=Axis((70, 0, 0), (0, 0, 1)), revolution_arc=177.47002769517965, mode=Mode.SUBTRACT)
    with BuildSketch(Plane(origin=(70.32010750628058, 14.496466161945248, 0), x_dir=(-0.22103228832590102, 0.9752664905129346, 0), z_dir=(-0.9752664905129346, -0.22103228832590102, 0))) as fillet11_piece_17:
        with BuildLine():
            CenterArc((3.000000000000001 - FILLET11_R, -FILLET11_R), FILLET11_R, 0, 90)
            Line((3.000000000000001 - FILLET11_R, 4.4e-16), (3.000000000000001, 0))
            Line((3.000000000000001, 0), (3.000000000000001, -FILLET11_R))
        make_face()
    revolve(axis=Axis((70.32010750628058, 14.496466161945248, 0), (0, 0, -1)), revolution_arc=14.03465763220782, mode=Mode.SUBTRACT)
    with BuildSketch(Plane(origin=(69.65701064130288, 17.42226563348405, 0), x_dir=(0, 0, 1), z_dir=(-0.9752664905129345, -0.2210322883259015, 0))) as fillet11_piece_18:
        with BuildLine():
            CenterArc((FILLET11_R, -FILLET11_R), FILLET11_R, 90, 90)
            Line((-4.4e-16, -FILLET11_R), (0, 0))
            Line((0, 0), (FILLET11_R, 0))
        make_face()
    extrude(amount=19.819827622309507, mode=Mode.SUBTRACT)
    with BuildSketch(Plane(origin=(49.664300048544064, 15.96724325143887, 0), x_dir=(0.22103228832590116, -0.9752664905129346, 0), z_dir=(0.9752664905129346, 0.22103228832590116, 0))) as fillet11_piece_19:
        with BuildLine():
            CenterArc((2.999999999999999 + FILLET11_R, -FILLET11_R), FILLET11_R, 90.00000000000004, 89.99999999999994)
            Line((2.999999999999999 + FILLET11_R, 4.4e-16), (2.999999999999999, 0))
            Line((2.999999999999999, 0), (3.000000000000001, -FILLET11_R))
        make_face()
    revolve(axis=Axis((49.664300048544064, 15.96724325143887, 0), (0, 0, -1)), revolution_arc=12.769671479797784, mode=Mode.SUBTRACT)


solid = part.part
